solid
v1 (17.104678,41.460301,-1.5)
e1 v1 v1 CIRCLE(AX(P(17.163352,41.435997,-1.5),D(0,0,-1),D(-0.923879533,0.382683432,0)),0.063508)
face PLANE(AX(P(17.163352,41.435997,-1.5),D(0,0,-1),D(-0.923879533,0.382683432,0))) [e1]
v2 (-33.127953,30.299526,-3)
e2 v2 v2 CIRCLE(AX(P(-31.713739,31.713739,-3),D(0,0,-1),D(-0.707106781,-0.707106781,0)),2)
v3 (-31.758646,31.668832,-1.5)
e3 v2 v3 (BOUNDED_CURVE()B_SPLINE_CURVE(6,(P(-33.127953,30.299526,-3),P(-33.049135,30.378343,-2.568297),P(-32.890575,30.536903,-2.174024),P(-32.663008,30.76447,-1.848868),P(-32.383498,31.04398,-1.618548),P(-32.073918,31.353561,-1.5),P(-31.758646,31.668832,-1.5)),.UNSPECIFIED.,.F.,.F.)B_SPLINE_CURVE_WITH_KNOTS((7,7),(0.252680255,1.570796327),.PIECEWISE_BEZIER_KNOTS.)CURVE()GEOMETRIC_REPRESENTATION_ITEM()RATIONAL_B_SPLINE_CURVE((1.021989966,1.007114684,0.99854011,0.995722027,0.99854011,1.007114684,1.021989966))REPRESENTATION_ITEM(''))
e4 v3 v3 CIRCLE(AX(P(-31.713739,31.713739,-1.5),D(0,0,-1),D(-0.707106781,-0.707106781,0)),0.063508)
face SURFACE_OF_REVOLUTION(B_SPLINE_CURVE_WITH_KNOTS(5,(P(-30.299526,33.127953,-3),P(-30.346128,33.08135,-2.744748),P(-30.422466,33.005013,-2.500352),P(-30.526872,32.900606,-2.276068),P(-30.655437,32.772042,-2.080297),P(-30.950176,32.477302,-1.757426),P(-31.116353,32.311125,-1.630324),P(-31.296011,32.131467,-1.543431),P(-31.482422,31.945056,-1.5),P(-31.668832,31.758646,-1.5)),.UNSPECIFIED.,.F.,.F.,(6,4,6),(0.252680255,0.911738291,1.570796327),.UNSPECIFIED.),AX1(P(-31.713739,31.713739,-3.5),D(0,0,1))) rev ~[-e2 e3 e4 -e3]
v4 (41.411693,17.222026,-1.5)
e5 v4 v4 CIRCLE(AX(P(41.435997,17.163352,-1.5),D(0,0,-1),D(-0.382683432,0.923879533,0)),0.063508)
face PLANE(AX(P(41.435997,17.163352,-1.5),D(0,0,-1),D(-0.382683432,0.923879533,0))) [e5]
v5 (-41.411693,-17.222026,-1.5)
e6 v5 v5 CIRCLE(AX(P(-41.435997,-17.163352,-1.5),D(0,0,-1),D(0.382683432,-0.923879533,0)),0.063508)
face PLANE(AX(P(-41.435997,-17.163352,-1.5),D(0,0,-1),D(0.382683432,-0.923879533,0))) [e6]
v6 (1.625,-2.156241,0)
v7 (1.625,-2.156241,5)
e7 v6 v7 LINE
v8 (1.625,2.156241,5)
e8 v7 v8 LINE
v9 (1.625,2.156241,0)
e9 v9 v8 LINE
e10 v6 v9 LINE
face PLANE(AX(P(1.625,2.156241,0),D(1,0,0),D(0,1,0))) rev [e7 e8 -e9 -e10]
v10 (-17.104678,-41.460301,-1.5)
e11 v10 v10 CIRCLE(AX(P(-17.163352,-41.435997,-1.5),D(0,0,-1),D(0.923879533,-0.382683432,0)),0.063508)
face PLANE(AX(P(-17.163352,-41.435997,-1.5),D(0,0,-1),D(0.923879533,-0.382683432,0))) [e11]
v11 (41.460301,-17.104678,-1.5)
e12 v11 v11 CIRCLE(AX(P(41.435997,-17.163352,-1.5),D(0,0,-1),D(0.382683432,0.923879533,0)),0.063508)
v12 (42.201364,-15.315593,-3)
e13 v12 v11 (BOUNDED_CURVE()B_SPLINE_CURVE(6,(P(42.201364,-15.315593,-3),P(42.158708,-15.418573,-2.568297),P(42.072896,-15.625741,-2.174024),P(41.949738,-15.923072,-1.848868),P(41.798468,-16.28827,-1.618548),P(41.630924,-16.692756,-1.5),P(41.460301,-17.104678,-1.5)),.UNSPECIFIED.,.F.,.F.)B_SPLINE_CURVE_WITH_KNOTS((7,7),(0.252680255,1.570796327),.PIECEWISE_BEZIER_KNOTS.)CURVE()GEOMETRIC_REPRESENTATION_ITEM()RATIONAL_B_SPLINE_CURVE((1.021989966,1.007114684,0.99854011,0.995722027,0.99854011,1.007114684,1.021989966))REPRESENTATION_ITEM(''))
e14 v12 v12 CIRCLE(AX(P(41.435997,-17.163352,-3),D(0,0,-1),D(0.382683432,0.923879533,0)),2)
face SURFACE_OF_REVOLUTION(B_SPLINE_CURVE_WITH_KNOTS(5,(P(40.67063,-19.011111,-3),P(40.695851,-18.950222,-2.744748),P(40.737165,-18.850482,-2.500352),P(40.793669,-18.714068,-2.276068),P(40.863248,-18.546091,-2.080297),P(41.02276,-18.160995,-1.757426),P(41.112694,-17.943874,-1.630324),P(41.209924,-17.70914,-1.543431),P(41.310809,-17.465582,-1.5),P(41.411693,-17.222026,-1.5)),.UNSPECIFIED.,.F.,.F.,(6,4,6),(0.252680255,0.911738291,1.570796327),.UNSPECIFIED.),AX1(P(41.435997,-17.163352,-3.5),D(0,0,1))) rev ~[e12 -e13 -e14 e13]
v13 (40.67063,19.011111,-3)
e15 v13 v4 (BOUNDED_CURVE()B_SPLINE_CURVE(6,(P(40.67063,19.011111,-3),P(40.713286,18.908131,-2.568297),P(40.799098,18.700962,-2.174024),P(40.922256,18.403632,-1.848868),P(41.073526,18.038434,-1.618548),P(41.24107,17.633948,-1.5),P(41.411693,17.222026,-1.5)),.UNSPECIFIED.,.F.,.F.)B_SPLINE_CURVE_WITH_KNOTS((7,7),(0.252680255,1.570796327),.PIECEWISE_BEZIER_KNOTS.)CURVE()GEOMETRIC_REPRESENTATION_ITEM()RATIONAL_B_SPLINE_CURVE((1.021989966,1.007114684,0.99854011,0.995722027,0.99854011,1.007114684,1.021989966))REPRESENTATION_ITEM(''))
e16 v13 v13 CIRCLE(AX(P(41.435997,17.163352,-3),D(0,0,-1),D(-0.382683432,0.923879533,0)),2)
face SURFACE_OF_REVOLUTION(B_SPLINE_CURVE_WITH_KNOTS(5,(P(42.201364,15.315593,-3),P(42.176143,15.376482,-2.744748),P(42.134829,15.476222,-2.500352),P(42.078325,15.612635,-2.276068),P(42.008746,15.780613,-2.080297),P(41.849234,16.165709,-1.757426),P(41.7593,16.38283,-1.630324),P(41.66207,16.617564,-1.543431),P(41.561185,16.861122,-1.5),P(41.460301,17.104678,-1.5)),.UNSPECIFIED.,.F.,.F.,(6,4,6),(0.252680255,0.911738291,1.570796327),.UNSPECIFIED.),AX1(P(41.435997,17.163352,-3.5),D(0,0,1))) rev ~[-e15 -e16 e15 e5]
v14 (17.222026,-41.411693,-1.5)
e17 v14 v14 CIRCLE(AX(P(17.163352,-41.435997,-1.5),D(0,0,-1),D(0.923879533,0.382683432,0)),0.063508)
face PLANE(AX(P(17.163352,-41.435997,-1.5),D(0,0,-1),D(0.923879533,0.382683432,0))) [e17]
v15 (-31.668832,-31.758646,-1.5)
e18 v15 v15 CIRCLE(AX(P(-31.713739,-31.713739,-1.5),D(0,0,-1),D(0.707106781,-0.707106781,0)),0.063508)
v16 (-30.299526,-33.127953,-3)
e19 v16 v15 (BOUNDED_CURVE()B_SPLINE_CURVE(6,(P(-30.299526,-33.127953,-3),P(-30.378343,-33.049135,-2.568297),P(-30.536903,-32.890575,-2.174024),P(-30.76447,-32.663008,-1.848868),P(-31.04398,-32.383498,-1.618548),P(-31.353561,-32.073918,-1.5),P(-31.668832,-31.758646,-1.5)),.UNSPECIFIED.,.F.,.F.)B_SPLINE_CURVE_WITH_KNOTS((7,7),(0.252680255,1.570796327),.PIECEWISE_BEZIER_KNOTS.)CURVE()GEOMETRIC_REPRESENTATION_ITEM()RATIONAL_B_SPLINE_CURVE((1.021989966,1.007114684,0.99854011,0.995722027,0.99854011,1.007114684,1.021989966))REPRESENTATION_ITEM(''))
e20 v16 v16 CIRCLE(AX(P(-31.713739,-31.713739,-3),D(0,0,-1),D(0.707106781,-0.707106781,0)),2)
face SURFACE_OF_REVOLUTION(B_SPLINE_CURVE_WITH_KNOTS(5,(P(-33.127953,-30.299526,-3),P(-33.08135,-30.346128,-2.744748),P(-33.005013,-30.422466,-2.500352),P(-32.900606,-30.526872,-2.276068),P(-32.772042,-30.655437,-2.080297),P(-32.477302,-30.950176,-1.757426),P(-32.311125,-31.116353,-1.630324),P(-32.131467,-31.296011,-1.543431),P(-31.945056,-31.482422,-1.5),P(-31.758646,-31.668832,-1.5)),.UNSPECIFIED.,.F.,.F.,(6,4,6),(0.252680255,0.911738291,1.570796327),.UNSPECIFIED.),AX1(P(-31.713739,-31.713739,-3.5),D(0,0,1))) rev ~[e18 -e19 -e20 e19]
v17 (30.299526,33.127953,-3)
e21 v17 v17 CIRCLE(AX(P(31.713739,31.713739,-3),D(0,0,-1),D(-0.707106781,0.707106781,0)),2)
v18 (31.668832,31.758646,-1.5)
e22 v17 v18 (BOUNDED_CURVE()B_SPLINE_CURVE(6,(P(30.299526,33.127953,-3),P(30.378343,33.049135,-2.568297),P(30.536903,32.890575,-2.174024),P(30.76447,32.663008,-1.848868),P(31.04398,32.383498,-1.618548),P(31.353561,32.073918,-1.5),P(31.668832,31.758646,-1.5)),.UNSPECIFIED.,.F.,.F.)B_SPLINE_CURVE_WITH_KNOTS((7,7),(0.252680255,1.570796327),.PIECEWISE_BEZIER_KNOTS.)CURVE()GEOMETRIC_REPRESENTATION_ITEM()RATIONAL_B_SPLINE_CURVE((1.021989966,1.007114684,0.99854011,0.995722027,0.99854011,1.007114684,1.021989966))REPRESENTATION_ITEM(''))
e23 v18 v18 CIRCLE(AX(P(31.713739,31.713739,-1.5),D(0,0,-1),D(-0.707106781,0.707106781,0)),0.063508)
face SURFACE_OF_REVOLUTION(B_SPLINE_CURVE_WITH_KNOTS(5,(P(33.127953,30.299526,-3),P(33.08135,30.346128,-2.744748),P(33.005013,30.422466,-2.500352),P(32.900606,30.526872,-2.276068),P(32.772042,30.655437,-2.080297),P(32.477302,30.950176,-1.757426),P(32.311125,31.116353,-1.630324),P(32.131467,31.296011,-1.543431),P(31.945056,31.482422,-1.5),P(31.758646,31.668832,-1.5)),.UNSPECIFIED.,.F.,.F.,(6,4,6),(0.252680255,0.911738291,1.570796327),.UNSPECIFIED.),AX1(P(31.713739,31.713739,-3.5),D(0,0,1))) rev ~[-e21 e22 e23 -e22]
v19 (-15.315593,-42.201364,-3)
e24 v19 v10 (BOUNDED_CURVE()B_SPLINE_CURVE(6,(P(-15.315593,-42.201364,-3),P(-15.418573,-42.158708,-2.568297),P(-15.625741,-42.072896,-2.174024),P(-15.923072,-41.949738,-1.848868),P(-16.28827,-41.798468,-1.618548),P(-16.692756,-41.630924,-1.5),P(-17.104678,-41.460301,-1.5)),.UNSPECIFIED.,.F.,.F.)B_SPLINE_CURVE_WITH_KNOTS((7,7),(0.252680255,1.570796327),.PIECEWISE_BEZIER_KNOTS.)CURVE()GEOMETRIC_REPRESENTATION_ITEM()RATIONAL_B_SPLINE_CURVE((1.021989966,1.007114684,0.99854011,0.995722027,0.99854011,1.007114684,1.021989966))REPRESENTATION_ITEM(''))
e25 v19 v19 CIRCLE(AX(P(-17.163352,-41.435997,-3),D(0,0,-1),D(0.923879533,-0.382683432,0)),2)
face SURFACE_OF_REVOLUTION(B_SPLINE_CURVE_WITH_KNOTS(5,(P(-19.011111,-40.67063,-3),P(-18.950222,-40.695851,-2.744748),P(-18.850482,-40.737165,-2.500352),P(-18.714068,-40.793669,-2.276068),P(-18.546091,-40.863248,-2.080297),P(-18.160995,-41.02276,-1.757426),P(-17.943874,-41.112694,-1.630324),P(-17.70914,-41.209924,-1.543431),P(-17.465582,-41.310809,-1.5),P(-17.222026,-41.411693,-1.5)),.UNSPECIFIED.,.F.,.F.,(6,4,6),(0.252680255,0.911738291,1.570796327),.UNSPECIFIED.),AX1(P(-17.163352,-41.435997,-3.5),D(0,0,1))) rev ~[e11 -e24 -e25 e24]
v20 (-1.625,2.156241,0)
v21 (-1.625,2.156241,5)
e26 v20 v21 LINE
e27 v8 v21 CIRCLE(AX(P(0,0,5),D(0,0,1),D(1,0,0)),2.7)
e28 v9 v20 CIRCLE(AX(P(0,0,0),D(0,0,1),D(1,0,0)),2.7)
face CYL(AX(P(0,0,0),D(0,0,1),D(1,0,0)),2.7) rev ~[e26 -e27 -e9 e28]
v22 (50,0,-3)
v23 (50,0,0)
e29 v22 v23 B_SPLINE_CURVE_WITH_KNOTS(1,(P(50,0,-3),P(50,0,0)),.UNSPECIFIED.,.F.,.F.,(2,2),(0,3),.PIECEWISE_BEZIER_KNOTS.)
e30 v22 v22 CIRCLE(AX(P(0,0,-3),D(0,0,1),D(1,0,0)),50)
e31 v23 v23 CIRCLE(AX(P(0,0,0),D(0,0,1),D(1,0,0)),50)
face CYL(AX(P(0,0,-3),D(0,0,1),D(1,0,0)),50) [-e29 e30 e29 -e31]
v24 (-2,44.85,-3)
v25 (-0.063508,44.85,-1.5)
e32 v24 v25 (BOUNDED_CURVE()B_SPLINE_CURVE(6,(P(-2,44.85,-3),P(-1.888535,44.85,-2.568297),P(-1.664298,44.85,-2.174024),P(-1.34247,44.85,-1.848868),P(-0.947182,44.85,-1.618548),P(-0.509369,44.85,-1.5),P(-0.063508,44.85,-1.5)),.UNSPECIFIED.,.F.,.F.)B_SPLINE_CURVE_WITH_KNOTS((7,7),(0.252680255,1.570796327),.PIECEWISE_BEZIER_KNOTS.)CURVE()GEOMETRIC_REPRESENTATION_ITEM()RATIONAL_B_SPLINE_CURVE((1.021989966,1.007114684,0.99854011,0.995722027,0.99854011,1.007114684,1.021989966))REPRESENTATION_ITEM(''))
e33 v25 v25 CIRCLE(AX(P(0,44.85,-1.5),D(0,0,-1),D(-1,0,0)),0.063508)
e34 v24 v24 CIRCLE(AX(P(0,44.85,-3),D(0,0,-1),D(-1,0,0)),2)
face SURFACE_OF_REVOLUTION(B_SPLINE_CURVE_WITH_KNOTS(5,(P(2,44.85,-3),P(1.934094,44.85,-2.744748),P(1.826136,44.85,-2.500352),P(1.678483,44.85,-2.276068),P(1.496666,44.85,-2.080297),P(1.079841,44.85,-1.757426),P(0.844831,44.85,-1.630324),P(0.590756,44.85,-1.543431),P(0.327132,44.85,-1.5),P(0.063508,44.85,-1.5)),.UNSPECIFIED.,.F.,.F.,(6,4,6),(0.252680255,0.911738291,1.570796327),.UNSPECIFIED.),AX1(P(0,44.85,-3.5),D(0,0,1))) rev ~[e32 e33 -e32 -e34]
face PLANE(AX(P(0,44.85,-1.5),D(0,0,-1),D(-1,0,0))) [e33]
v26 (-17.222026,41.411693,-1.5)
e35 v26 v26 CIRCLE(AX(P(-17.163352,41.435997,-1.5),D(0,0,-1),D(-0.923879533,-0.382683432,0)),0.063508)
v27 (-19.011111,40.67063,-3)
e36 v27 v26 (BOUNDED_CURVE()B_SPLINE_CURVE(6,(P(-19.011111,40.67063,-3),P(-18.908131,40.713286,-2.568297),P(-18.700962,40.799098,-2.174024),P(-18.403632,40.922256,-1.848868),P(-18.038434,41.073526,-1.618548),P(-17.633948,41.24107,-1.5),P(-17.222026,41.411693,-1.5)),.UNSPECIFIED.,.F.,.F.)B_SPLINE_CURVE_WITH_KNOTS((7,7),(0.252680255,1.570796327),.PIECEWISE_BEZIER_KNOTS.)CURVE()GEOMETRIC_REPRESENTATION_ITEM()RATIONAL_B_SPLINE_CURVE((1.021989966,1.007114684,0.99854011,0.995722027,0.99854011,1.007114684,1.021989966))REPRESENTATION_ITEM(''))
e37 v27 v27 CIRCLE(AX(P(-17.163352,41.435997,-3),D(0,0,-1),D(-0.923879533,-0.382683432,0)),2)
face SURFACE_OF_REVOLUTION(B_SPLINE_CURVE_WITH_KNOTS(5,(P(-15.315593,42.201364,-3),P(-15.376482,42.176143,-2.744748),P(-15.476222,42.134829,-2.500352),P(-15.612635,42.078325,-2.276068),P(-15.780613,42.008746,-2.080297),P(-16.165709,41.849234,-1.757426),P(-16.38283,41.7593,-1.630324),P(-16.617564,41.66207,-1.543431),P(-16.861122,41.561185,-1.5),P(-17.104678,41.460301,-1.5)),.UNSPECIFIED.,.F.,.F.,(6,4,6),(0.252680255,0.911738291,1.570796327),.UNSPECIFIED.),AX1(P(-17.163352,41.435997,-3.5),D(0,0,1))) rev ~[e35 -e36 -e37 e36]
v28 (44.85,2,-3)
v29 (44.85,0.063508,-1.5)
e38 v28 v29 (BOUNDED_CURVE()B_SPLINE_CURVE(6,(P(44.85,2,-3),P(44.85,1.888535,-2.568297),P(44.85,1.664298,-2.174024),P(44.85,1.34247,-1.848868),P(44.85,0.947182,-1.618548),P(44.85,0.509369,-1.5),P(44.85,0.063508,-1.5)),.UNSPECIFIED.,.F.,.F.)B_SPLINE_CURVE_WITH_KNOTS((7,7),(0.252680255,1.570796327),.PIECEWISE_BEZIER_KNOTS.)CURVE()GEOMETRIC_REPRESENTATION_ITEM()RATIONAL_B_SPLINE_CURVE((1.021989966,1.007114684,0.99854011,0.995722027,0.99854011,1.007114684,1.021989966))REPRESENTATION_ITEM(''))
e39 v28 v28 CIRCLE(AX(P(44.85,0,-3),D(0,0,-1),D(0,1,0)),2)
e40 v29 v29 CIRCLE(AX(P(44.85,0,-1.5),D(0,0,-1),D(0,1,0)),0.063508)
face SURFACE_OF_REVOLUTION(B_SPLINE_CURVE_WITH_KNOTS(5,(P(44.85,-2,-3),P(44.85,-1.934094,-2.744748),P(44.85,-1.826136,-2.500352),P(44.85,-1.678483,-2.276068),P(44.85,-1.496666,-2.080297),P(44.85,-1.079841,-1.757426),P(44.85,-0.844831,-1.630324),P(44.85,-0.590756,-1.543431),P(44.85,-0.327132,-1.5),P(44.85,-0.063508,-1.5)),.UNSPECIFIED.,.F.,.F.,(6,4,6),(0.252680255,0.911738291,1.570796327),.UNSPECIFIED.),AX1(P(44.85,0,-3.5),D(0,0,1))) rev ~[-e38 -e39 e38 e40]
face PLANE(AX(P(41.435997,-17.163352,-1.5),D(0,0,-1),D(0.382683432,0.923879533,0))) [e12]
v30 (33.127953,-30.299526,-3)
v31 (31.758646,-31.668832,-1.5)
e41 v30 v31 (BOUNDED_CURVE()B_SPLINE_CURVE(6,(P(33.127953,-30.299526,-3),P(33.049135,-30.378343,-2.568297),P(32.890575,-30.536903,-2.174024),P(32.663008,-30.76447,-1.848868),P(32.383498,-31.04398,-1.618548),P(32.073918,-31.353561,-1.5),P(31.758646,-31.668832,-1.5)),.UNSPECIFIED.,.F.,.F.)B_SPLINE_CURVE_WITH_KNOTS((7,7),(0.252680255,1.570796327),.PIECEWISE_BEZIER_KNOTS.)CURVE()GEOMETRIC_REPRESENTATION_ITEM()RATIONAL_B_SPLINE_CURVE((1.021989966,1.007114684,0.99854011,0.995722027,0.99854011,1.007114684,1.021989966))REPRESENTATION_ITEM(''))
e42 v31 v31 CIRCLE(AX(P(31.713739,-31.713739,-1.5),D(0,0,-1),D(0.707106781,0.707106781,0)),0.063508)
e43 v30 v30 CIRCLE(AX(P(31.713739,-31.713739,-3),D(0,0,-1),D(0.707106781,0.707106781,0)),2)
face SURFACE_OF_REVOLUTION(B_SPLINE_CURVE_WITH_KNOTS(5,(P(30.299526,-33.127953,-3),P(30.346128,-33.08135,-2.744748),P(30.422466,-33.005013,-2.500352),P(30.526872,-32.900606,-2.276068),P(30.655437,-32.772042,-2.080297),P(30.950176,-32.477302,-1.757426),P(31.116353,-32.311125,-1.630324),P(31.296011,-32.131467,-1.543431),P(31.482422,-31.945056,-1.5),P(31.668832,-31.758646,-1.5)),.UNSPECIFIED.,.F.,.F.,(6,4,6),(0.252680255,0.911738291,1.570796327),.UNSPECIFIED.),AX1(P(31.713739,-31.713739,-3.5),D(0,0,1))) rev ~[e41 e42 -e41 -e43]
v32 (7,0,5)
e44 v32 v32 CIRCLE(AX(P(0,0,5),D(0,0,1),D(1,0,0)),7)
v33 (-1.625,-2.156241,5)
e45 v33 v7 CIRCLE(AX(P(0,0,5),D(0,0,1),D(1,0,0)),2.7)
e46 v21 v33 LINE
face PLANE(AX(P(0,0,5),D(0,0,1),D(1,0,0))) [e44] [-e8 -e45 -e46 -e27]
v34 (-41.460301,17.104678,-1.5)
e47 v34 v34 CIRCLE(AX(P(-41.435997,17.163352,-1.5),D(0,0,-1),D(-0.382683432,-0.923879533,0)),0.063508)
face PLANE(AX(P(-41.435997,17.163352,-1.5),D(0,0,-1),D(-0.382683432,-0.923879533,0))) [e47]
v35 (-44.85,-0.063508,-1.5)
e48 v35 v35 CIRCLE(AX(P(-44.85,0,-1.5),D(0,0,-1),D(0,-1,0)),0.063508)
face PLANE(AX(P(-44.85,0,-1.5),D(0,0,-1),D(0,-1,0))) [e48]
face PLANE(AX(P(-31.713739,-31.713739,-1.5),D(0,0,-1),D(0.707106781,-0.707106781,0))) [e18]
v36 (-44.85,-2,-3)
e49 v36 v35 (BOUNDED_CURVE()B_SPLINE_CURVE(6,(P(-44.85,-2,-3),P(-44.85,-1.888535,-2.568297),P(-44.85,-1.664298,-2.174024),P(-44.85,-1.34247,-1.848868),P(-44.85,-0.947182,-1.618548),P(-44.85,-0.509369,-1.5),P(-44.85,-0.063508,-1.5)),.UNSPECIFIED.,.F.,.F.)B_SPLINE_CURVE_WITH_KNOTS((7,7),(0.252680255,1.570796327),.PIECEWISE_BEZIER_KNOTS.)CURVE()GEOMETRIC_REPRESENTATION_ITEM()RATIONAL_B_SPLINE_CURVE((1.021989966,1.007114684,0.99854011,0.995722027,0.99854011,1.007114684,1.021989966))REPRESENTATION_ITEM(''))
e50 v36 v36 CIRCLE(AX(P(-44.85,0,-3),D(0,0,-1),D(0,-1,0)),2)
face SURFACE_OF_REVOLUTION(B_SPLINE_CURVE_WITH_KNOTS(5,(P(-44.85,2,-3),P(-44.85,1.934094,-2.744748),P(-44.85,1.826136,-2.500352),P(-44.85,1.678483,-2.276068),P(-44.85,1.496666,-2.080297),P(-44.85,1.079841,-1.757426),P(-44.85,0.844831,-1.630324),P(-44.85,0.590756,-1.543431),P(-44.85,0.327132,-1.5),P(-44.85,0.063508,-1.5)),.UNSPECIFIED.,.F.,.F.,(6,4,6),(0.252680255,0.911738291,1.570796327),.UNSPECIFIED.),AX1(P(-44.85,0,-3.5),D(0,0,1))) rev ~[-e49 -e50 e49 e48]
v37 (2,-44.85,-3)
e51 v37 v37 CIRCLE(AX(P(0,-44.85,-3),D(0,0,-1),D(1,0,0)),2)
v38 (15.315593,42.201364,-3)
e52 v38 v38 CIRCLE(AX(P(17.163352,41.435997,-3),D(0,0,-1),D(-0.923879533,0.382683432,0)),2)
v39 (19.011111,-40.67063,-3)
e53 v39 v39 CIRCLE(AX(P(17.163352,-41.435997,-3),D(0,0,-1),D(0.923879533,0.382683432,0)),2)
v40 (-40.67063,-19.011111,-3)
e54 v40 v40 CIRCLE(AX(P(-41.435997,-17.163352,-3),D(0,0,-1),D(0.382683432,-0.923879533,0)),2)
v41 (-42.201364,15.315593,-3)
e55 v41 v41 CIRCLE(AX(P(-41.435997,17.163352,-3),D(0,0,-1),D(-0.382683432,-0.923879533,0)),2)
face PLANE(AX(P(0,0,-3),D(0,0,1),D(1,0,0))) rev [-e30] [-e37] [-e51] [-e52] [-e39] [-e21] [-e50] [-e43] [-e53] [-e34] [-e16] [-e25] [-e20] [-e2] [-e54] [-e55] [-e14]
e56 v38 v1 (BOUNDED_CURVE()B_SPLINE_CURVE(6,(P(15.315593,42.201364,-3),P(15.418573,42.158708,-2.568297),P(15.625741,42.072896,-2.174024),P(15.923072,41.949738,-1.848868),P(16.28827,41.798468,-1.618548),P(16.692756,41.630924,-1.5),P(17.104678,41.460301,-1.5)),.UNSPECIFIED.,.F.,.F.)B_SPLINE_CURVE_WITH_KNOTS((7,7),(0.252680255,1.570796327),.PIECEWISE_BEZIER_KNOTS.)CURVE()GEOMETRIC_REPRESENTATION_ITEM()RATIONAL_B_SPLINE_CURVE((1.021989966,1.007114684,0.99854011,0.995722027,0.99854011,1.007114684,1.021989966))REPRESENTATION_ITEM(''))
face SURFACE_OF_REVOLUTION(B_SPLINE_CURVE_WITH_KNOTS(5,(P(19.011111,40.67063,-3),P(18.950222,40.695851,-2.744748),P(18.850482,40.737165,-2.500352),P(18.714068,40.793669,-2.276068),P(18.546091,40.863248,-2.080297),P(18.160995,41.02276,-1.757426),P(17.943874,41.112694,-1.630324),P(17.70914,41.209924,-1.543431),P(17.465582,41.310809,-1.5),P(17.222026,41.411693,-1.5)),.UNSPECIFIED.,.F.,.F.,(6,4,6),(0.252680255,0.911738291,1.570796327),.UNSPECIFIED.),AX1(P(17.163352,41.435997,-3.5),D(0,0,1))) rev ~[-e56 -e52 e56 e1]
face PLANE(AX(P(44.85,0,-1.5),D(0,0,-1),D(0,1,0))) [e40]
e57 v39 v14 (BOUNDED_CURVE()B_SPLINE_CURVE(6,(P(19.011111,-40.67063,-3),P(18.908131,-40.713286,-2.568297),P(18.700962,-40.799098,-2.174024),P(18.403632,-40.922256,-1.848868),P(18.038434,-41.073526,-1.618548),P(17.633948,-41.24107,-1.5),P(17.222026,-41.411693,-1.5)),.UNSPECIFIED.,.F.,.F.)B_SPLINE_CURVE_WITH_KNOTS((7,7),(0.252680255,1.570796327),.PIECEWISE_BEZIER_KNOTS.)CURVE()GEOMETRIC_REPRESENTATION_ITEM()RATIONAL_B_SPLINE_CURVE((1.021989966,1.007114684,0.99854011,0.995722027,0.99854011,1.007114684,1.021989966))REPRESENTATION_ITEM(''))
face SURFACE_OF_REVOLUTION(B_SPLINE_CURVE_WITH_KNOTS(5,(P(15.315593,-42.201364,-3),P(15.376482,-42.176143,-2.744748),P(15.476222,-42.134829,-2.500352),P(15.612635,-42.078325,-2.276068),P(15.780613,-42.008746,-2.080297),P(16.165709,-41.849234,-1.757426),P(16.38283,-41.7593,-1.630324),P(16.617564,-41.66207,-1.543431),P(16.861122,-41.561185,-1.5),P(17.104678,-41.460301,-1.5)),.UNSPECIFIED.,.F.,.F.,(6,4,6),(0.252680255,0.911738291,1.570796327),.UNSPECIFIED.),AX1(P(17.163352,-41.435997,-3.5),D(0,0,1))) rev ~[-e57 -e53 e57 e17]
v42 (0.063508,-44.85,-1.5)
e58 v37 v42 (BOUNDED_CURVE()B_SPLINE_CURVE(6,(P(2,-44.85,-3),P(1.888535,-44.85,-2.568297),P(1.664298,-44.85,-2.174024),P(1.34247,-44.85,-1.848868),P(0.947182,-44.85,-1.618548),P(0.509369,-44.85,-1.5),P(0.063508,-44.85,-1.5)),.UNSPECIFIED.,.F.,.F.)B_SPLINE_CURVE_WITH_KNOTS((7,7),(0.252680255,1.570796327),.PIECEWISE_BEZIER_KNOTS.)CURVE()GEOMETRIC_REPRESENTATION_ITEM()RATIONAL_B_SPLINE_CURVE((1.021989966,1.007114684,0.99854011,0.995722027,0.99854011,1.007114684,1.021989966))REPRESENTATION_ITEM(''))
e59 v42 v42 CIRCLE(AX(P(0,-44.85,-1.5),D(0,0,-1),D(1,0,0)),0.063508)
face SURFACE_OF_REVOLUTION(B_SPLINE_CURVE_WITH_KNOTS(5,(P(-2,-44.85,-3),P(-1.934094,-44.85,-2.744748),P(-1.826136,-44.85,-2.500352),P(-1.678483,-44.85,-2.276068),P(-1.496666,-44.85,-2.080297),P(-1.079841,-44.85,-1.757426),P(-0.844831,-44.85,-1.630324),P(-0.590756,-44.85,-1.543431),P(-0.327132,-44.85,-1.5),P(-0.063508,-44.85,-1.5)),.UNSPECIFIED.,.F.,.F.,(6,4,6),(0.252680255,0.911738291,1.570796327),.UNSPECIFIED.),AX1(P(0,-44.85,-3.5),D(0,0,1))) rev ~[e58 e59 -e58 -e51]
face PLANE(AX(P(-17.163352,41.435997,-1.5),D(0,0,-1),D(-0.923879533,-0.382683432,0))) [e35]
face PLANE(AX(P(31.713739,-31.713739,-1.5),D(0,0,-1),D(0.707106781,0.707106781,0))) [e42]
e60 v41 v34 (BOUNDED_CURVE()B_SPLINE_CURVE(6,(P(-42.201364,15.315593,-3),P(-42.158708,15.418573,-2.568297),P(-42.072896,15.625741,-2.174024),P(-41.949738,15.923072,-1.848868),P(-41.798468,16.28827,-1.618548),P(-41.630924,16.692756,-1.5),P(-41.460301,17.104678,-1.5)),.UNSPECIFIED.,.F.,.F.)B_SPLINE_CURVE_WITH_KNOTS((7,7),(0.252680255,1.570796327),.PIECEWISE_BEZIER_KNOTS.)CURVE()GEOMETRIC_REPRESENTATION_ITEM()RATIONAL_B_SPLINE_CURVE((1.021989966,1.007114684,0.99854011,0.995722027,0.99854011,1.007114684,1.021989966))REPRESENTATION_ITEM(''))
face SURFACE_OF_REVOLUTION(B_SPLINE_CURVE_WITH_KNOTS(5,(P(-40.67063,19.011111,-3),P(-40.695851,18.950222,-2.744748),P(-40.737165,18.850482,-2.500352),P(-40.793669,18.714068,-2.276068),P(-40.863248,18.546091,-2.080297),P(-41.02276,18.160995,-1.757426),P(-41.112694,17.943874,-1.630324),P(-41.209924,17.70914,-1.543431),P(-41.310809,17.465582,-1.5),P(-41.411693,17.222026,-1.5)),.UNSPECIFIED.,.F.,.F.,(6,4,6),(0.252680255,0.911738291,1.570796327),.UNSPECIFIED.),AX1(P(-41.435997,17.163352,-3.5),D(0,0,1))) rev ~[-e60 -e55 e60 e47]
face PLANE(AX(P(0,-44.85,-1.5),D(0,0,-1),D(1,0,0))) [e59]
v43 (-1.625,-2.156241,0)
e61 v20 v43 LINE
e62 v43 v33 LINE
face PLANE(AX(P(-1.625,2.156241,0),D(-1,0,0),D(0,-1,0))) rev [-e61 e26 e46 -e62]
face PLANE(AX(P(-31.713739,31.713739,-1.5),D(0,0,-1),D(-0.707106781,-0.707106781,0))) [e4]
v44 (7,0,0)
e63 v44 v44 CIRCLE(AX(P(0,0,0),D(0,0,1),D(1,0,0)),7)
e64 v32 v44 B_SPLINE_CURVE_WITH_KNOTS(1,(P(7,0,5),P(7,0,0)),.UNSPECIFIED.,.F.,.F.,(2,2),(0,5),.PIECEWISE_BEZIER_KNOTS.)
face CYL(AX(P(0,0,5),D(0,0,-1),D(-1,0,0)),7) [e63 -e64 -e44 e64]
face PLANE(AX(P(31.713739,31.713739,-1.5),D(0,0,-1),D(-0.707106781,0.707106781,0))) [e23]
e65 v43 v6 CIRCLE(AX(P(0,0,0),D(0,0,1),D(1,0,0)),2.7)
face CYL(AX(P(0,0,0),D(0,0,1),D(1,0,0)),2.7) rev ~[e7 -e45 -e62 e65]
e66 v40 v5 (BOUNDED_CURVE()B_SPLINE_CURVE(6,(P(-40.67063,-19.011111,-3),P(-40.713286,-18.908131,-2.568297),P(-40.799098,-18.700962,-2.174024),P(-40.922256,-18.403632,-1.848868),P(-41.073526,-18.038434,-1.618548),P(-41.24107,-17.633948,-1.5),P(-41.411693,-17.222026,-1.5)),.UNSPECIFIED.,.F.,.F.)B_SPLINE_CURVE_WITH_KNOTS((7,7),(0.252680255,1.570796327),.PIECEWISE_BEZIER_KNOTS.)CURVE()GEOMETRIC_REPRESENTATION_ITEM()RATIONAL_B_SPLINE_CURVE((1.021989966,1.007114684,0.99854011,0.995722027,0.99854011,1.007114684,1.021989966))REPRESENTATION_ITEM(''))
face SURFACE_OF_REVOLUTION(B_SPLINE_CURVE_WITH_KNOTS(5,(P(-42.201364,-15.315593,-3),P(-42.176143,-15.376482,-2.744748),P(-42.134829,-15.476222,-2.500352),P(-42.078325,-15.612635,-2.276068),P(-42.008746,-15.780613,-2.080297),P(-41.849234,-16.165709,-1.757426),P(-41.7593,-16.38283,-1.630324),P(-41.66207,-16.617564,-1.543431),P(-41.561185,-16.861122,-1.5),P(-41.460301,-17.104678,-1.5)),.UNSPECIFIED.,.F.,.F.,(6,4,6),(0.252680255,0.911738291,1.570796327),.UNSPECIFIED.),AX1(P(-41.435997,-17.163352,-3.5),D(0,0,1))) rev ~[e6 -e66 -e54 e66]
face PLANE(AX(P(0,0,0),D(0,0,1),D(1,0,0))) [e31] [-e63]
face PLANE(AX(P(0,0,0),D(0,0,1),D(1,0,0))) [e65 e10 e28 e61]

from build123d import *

# Parameters (mm, degrees)
SKETCH1_R                = 50
BOSS_EXTRUDE1_DEPTH      = 3
SKETCH2_R                = 7
BOSS_EXTRUDE2_DEPTH      = 5
CUT_EXTRUDE1_DEPTH       = 5
SKETCH4_R                = 2
CUT_EXTRUDE2_DEPTH       = 1.5
FILLET1_R                = 2
CIRPATTERN4_COUNT        = 16
FILLET1_OF_CIRPATTERN4_R = 2


with BuildPart() as part:
    # Sketch1 → Boss-Extrude1 (new body)
    with BuildSketch(Plane.XY):
        Circle(SKETCH1_R)
    extrude(amount=-BOSS_EXTRUDE1_DEPTH)

    # Sketch2 → Boss-Extrude2 (add)
    with BuildSketch(Plane.XY):
        Circle(SKETCH2_R)
    extrude(amount=BOSS_EXTRUDE2_DEPTH)

    # Sketch3 → Cut-Extrude1 (cut)
    with BuildSketch(Plane.XY.offset(5)):
        with BuildLine():
            Line((-1.625, 2.156240942), (-1.625, -2.156240942))
            ThreePointArc((-1.625, -2.156240942), (0, -2.7), (1.625, -2.156240942))
            Line((1.625, -2.156240942), (1.625, 2.156240942))
            ThreePointArc((1.625, 2.156240942), (0, 2.7), (-1.625, 2.156240942))
        make_face()
    extrude(amount=-CUT_EXTRUDE1_DEPTH, mode=Mode.SUBTRACT)

    # Sketch4 → Cut-Extrude2 (cut)
    with BuildSketch(Plane(origin=(0, 0, -3), x_dir=(-1, 0, 0), z_dir=(0, 0, -1))):
        with Locations((0, 44.850000011)):
            Circle(SKETCH4_R)
    cut_extrude2 = extrude(amount=-CUT_EXTRUDE2_DEPTH, mode=Mode.SUBTRACT)

    # Fillet1
    # the kernel refuses this fillet: 2 mm, written as the material it adds along each edge
    with BuildSketch(Plane(origin=(0, 44.850000011, -1.5), x_dir=(-1, 0, 0), z_dir=(0, -1, 0))) as fillet1_piece_1:
        with BuildLine():
            CenterArc((0.063508327, 2), FILLET1_R, 270, 75.522487814)
            Line((0.063508327, 0), (0.063508327, -0.04))
            Line((0.063508327, -0.04), (2, -0.04))
            Line((2, -0.04), (2.04, 0))
            ThreePointArc((2.04, 0), (2.04, 0.75), (2.038729833, 1.49))
            Line((2.038729833, 1.49), (2, 1.5))
        make_face()
    revolve(axis=Axis((0, 44.850000011, -1.5), (0, 0, -1)))

    # CirPattern4: Cut-Extrude2 ×16 about axis
    cirpattern4_axis = Axis((0, 0, 0), (0, 0, 1))
    for i in range(1, CIRPATTERN4_COUNT):
        add(cut_extrude2.rotate(cirpattern4_axis, i * 360 / CIRPATTERN4_COUNT), mode=Mode.SUBTRACT)

    # Fillet1 of CirPattern4
    # the kernel refuses this fillet: 2 mm, written as the material it adds along each edge
    with BuildSketch(Plane(origin=(-17.163351946, 41.435997043, -1.5), x_dir=(-0.9238795325112861, -0.3826834323650914, 0), z_dir=(0.3826834323650914, -0.9238795325112861, 0))) as fillet1_of_cirpattern4_piece_1:
        with BuildLine():
            CenterArc((0.063508327, 2), FILLET1_OF_CIRPATTERN4_R, 270, 75.522487814)
            Line((0.063508327, 0), (0.063508327, -0.04))
            Line((0.063508327, -0.04), (2, -0.04))
            Line((2, -0.04), (2.04, 0))
            ThreePointArc((2.04, 0), (2.04, 0.75), (2.038729833, 1.49))
            Line((2.038729833, 1.49), (2, 1.5))
        make_face()
    revolve(axis=Axis((-17.163351946, 41.435997043, -1.5), (0, 0, -1)))
    with BuildSketch(Plane(origin=(-31.713739144, 31.713739144, -1.5), x_dir=(-0.7071067811865467, -0.7071067811865485, 0), z_dir=(0.7071067811865485, -0.7071067811865467, 0))) as fillet1_of_cirpattern4_piece_2:
        with BuildLine():
            CenterArc((0.063508327, 2), FILLET1_OF_CIRPATTERN4_R, 270, 75.522487814)
            Line((0.063508327, 0), (0.063508327, -0.04))
            Line((0.063508327, -0.04), (2, -0.04))
            Line((2, -0.04), (2.04, 0))
            ThreePointArc((2.04, 0), (2.04, 0.75), (2.038729833, 1.49))
            Line((2.038729833, 1.49), (2, 1.5))
        make_face()
    revolve(axis=Axis((-31.713739144, 31.713739144, -1.5), (0, 0, -1)))
    with BuildSketch(Plane(origin=(-41.435997043, 17.163351946, -1.5), x_dir=(-0.3826834323650911, -0.9238795325112863, 0), z_dir=(0.9238795325112863, -0.3826834323650911, 0))) as fillet1_of_cirpattern4_piece_3:
        with BuildLine():
            CenterArc((0.063508327, 2), FILLET1_OF_CIRPATTERN4_R, 270, 75.522487814)
            Line((0.063508327, 0), (0.063508327, -0.04))
            Line((0.063508327, -0.04), (2, -0.04))
            Line((2, -0.04), (2.04, 0))
            ThreePointArc((2.04, 0), (2.04, 0.75), (2.038729833, 1.49))
            Line((2.038729833, 1.49), (2, 1.5))
        make_face()
    revolve(axis=Axis((-41.435997043, 17.163351946, -1.5), (0, 0, -1)))
    with BuildSketch(Plane(origin=(-44.850000011, 0, -1.5), x_dir=(0, -1, 0), z_dir=(1, 0, 0))) as fillet1_of_cirpattern4_piece_4:
        with BuildLine():
            CenterArc((0.063508327, 2), FILLET1_OF_CIRPATTERN4_R, 270, 75.522487814)
            Line((0.063508327, 0), (0.063508327, -0.04))
            Line((0.063508327, -0.04), (2, -0.04))
            Line((2, -0.04), (2.04, 0))
            ThreePointArc((2.04, 0), (2.04, 0.75), (2.038729833, 1.49))
            Line((2.038729833, 1.49), (2, 1.5))
        make_face()
    revolve(axis=Axis((-44.850000011, 0, -1.5), (0, 0, -1)))
    with BuildSketch(Plane(origin=(-41.435997043, -17.163351946, -1.5), x_dir=(0.3826834323650914, -0.9238795325112861, 0), z_dir=(0.9238795325112861, 0.3826834323650914, 0))) as fillet1_of_cirpattern4_piece_5:
        with BuildLine():
            CenterArc((0.063508327, 2), FILLET1_OF_CIRPATTERN4_R, 270, 75.522487814)
            Line((0.063508327, 0), (0.063508327, -0.04))
            Line((0.063508327, -0.04), (2, -0.04))
            Line((2, -0.04), (2.04, 0))
            ThreePointArc((2.04, 0), (2.04, 0.75), (2.038729833, 1.49))
            Line((2.038729833, 1.49), (2, 1.5))
        make_face()
    revolve(axis=Axis((-41.435997043, -17.163351946, -1.5), (0, 0, -1)))
    with BuildSketch(Plane(origin=(-31.713739144, -31.713739144, -1.5), x_dir=(0.7071067811865485, -0.7071067811865467, 0), z_dir=(0.7071067811865467, 0.7071067811865485, 0))) as fillet1_of_cirpattern4_piece_6:
        with BuildLine():
            CenterArc((0.063508327, 2), FILLET1_OF_CIRPATTERN4_R, 270, 75.522487814)
            Line((0.063508327, 0), (0.063508327, -0.04))
            Line((0.063508327, -0.04), (2, -0.04))
            Line((2, -0.04), (2.04, 0))
            ThreePointArc((2.04, 0), (2.04, 0.75), (2.038729833, 1.49))
            Line((2.038729833, 1.49), (2, 1.5))
        make_face()
    revolve(axis=Axis((-31.713739144, -31.713739144, -1.5), (0, 0, -1)))
    with BuildSketch(Plane(origin=(-17.163351946, -41.435997043, -1.5), x_dir=(0.9238795325112863, -0.3826834323650911, 0), z_dir=(0.3826834323650911, 0.9238795325112863, 0))) as fillet1_of_cirpattern4_piece_7:
        with BuildLine():
            CenterArc((0.063508327, 2), FILLET1_OF_CIRPATTERN4_R, 270, 75.522487814)
            Line((0.063508327, 0), (0.063508327, -0.04))
            Line((0.063508327, -0.04), (2, -0.04))
            Line((2, -0.04), (2.04, 0))
            ThreePointArc((2.04, 0), (2.04, 0.75), (2.038729833, 1.49))
            Line((2.038729833, 1.49), (2, 1.5))
        make_face()
    revolve(axis=Axis((-17.163351946, -41.435997043, -1.5), (0, 0, -1)))
    with BuildSketch(Plane(origin=(0, -44.850000011, -1.5), x_dir=(1, 0, 0), z_dir=(0, 1, 0))) as fillet1_of_cirpattern4_piece_8:
        with BuildLine():
            CenterArc((0.063508327, 2), FILLET1_OF_CIRPATTERN4_R, 270, 75.522487814)
            Line((0.063508327, 0), (0.063508327, -0.04))
            Line((0.063508327, -0.04), (2, -0.04))
            Line((2, -0.04), (2.04, 0))
            ThreePointArc((2.04, 0), (2.04, 0.75), (2.038729833, 1.49))
            Line((2.038729833, 1.49), (2, 1.5))
        make_face()
    revolve(axis=Axis((0, -44.850000011, -1.5), (0, 0, -1)))
    with BuildSketch(Plane(origin=(17.163351946, -41.435997043, -1.5), x_dir=(0.9238795325112864, 0.3826834323650908, 0), z_dir=(-0.3826834323650908, 0.9238795325112864, 0))) as fillet1_of_cirpattern4_piece_9:
        with BuildLine():
            CenterArc((0.063508327, 2), FILLET1_OF_CIRPATTERN4_R, 270, 75.522487814)
            Line((0.063508327, 0), (0.063508327, -0.04))
            Line((0.063508327, -0.04), (2, -0.04))
            Line((2, -0.04), (2.04, 0))
            ThreePointArc((2.04, 0), (2.04, 0.75), (2.038729833, 1.49))
            Line((2.038729833, 1.49), (2, 1.5))
        make_face()
    revolve(axis=Axis((17.163351946, -41.435997043, -1.5), (0, 0, -1)))
    with BuildSketch(Plane(origin=(31.713739144, -31.713739144, -1.5), x_dir=(0.7071067811865467, 0.7071067811865485, 0), z_dir=(-0.7071067811865485, 0.7071067811865467, 0))) as fillet1_of_cirpattern4_piece_10:
        with BuildLine():
            CenterArc((0.063508327, 2), FILLET1_OF_CIRPATTERN4_R, 270, 75.522487814)
            Line((0.063508327, 0), (0.063508327, -0.04))
            Line((0.063508327, -0.04), (2, -0.04))
            Line((2, -0.04), (2.04, 0))
            ThreePointArc((2.04, 0), (2.04, 0.75), (2.038729833, 1.49))
            Line((2.038729833, 1.49), (2, 1.5))
        make_face()
    revolve(axis=Axis((31.713739144, -31.713739144, -1.5), (0, 0, -1)))
    with BuildSketch(Plane(origin=(41.435997043, -17.163351946, -1.5), x_dir=(0.3826834323650908, 0.9238795325112864, 0), z_dir=(-0.9238795325112864, 0.3826834323650908, 0))) as fillet1_of_cirpattern4_piece_11:
        with BuildLine():
            CenterArc((0.063508327, 2), FILLET1_OF_CIRPATTERN4_R, 270, 75.522487814)
            Line((0.063508327, 0), (0.063508327, -0.04))
            Line((0.063508327, -0.04), (2, -0.04))
            Line((2, -0.04), (2.04, 0))
            ThreePointArc((2.04, 0), (2.04, 0.75), (2.038729833, 1.49))
            Line((2.038729833, 1.49), (2, 1.5))
        make_face()
    revolve(axis=Axis((41.435997043, -17.163351946, -1.5), (0, 0, -1)))
    with BuildSketch(Plane(origin=(44.850000011, 0, -1.5), x_dir=(0, 1, 0), z_dir=(-1, 0, 0))) as fillet1_of_cirpattern4_piece_12:
        with BuildLine():
            CenterArc((0.063508327, 2), FILLET1_OF_CIRPATTERN4_R, 270, 75.522487814)
            Line((0.063508327, 0), (0.063508327, -0.04))
            Line((0.063508327, -0.04), (2, -0.04))
            Line((2, -0.04), (2.04, 0))
            ThreePointArc((2.04, 0), (2.04, 0.75), (2.038729833, 1.49))
            Line((2.038729833, 1.49), (2, 1.5))
        make_face()
    revolve(axis=Axis((44.850000011, 0, -1.5), (0, 0, -1)))
    with BuildSketch(Plane(origin=(41.435997043, 17.163351946, -1.5), x_dir=(-0.3826834323650914, 0.9238795325112861, 0), z_dir=(-0.9238795325112861, -0.3826834323650914, 0))) as fillet1_of_cirpattern4_piece_13:
        with BuildLine():
            CenterArc((0.063508327, 2), FILLET1_OF_CIRPATTERN4_R, 270, 75.522487814)
            Line((0.063508327, 0), (0.063508327, -0.04))
            Line((0.063508327, -0.04), (2, -0.04))
            Line((2, -0.04), (2.04, 0))
            ThreePointArc((2.04, 0), (2.04, 0.75), (2.038729833, 1.49))
            Line((2.038729833, 1.49), (2, 1.5))
        make_face()
    revolve(axis=Axis((41.435997043, 17.163351946, -1.5), (0, 0, -1)))
    with BuildSketch(Plane(origin=(31.713739144, 31.713739144, -1.5), x_dir=(-0.7071067811865485, 0.7071067811865467, 0), z_dir=(-0.7071067811865467, -0.7071067811865485, 0))) as fillet1_of_cirpattern4_piece_14:
        with BuildLine():
            CenterArc((0.063508327, 2), FILLET1_OF_CIRPATTERN4_R, 270, 75.522487814)
            Line((0.063508327, 0), (0.063508327, -0.04))
            Line((0.063508327, -0.04), (2, -0.04))
            Line((2, -0.04), (2.04, 0))
            ThreePointArc((2.04, 0), (2.04, 0.75), (2.038729833, 1.49))
            Line((2.038729833, 1.49), (2, 1.5))
        make_face()
    revolve(axis=Axis((31.713739144, 31.713739144, -1.5), (0, 0, -1)))
    with BuildSketch(Plane(origin=(17.163351946, 41.435997043, -1.5), x_dir=(-0.9238795325112864, 0.3826834323650908, 0), z_dir=(-0.3826834323650908, -0.9238795325112864, 0))) as fillet1_of_cirpattern4_piece_15:
        with BuildLine():
            CenterArc((0.063508327, 2), FILLET1_OF_CIRPATTERN4_R, 270, 75.522487814)
            Line((0.063508327, 0), (0.063508327, -0.04))
            Line((0.063508327, -0.04), (2, -0.04))
            Line((2, -0.04), (2.04, 0))
            ThreePointArc((2.04, 0), (2.04, 0.75), (2.038729833, 1.49))
            Line((2.038729833, 1.49), (2, 1.5))
        make_face()
    revolve(axis=Axis((17.163351946, 41.435997043, -1.5), (0, 0, -1)))


solid = part.part
